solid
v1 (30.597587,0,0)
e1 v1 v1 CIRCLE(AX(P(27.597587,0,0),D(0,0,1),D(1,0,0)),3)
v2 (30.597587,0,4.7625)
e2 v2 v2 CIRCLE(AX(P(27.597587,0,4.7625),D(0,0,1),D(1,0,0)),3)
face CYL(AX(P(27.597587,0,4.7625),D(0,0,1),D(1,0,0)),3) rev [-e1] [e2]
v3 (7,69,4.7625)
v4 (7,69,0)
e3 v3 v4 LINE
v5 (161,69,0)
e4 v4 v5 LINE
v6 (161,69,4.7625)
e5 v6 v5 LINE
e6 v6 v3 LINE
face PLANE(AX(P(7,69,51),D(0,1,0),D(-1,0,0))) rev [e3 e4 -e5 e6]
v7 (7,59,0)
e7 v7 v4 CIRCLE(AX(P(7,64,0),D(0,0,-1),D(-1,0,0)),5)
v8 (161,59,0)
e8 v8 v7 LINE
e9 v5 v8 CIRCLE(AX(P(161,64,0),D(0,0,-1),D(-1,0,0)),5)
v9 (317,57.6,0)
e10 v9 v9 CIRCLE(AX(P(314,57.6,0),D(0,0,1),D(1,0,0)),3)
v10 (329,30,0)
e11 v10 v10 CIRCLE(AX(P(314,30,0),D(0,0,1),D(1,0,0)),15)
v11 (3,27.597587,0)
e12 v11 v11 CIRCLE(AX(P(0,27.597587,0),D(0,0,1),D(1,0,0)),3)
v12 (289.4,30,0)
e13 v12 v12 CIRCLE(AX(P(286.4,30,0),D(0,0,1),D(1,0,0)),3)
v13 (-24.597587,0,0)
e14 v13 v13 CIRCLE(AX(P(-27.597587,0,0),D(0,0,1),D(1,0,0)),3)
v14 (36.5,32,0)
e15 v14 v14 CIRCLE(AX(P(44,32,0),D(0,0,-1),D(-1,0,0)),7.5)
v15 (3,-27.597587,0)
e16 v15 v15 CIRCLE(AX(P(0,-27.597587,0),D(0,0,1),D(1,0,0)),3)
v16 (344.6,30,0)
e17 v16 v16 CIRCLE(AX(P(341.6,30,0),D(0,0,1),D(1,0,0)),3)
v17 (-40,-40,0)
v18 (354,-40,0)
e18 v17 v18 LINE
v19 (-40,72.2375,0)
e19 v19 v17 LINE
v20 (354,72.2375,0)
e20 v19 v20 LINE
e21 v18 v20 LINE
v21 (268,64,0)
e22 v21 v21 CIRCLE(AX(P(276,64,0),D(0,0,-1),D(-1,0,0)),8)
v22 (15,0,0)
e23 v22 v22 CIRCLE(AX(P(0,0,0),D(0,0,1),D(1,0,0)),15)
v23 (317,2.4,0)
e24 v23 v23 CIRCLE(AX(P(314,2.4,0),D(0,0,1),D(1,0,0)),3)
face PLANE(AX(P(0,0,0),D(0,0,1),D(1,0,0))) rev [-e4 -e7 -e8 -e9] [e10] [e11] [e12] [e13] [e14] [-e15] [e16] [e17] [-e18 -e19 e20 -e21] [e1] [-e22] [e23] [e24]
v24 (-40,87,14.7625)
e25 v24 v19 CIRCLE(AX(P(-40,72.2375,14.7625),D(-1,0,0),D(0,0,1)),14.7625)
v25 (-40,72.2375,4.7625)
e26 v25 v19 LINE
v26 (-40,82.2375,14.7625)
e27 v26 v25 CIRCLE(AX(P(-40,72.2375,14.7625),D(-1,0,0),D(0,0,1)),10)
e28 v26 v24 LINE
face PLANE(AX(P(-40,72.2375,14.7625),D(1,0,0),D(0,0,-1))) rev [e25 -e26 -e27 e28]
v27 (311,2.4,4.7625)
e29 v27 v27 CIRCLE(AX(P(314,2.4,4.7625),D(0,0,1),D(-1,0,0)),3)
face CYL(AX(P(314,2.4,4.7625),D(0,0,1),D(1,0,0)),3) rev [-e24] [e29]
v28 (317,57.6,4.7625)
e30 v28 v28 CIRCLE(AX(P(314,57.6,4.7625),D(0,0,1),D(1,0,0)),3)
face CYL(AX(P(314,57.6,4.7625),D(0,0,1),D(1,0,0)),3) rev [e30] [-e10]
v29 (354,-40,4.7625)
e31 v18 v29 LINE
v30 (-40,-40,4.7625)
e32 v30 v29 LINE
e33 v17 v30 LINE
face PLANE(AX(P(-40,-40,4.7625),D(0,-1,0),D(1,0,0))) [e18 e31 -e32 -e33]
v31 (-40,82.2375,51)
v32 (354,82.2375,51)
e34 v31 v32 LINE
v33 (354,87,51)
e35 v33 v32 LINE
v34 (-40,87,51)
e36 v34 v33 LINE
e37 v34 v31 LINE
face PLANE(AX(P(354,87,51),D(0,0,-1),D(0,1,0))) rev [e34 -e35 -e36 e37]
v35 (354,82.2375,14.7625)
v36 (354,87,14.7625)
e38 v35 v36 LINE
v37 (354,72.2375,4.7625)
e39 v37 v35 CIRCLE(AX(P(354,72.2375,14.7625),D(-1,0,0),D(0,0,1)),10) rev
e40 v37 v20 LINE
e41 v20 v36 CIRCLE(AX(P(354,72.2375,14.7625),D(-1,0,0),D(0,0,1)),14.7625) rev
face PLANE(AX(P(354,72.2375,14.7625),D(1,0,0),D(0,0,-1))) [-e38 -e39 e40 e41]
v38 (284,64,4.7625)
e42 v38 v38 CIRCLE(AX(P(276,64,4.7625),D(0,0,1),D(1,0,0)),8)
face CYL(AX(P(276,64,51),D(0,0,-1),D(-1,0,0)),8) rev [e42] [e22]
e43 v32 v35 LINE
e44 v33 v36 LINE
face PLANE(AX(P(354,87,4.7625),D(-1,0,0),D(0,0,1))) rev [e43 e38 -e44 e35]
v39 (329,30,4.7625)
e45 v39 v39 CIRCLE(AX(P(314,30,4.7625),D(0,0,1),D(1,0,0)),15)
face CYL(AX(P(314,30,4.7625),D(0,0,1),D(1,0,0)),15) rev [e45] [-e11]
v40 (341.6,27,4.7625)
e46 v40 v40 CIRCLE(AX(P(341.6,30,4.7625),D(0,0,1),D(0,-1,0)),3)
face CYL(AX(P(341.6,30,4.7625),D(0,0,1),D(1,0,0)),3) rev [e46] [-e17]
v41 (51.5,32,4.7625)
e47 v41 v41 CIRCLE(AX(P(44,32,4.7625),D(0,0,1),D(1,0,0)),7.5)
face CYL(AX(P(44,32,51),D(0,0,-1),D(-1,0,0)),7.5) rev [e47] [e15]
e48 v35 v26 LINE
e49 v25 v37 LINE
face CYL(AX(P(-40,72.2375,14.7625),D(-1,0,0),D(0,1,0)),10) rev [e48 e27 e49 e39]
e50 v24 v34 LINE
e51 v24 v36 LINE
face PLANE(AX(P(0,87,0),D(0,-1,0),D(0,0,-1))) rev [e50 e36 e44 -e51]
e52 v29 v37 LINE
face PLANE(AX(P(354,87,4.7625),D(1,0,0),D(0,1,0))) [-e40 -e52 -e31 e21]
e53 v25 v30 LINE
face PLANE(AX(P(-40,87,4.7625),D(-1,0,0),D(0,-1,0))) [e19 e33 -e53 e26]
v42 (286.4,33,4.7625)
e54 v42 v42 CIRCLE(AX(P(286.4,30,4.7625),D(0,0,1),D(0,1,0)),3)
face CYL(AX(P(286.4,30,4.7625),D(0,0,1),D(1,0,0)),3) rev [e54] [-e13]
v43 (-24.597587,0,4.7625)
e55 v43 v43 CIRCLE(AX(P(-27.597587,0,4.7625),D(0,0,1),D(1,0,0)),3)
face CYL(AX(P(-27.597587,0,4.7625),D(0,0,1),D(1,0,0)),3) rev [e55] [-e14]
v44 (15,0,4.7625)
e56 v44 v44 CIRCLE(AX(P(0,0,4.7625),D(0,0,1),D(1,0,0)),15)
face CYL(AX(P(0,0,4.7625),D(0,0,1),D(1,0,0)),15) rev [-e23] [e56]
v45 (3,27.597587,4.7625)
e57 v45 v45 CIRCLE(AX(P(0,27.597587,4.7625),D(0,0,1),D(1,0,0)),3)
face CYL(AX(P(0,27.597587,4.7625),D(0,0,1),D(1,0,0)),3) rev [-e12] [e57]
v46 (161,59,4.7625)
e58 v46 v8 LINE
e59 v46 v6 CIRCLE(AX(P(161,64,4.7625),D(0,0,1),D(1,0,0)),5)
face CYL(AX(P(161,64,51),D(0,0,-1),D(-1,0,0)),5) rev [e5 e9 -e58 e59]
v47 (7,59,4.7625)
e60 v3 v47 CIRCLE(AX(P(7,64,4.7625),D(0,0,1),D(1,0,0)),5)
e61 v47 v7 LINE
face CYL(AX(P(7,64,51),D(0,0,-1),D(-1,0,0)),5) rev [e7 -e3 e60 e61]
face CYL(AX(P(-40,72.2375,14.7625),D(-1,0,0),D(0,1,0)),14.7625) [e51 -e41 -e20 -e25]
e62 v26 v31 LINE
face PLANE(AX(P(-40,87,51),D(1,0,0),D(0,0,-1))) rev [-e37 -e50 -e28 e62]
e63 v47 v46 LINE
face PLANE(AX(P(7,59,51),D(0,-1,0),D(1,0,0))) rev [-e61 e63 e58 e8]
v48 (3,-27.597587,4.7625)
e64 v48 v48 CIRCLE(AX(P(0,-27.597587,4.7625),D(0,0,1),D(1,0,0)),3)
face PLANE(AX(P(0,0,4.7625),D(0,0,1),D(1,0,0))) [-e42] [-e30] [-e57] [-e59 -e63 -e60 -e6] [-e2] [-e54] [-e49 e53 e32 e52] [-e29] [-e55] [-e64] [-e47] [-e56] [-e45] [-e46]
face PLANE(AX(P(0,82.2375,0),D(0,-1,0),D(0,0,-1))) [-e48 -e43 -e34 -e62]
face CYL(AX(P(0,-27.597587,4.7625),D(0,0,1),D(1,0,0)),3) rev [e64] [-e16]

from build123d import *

# Parameters (mm, degrees)
CROQUIS1_W                       = 394
CROQUIS1_H                       = 127
CROQUIS1_R                       = 15
SALIENTE_EXTRUIR1_DEPTH          = 4.7625
CROQUIS2_R                       = 3
CORTAR_EXTRUIR1_DEPTH            = 365.565057851
CROQUIS3_R                       = 3
CORTAR_EXTRUIR2_DEPTH            = 365.565057851
MATRIZC1_COUNT                   = 4
BRIDA_DE_ARISTA1_STRIP_W         = 39.05
BRIDA_DE_ARISTA1_STRIP_H         = 4.7625
BRIDA_DE_ARISTA1_STRIP_CUT_DEPTH = 394
BRIDA_DE_ARISTA1_DEPTH           = 394
CORTAR_EXTRUIR3_DEPTH            = 369.084229491
CROQUIS15_R                      = 7.5
CORTAR_EXTRUIR4_DEPTH            = 369.084229491
CROQUIS16_R                      = 8
CORTAR_EXTRUIR5_DEPTH            = 369.084229491


# Sheet-metal steps are written as plain solids
with BuildPart() as part:
    # Croquis1 → Saliente-Extruir1 (new body)
    with BuildSketch(Plane.XY):
        with Locations((157, 23.5)):
            Rectangle(CROQUIS1_W, CROQUIS1_H)
        with Locations(Location((0, 0, 0), (0, 0, 180))):
            Circle(CROQUIS1_R, mode=Mode.SUBTRACT)
        with Locations(Location((314, 30, 0), (0, 0, 180))):
            Circle(CROQUIS1_R, mode=Mode.SUBTRACT)
    extrude(amount=SALIENTE_EXTRUIR1_DEPTH)

    # Croquis2 → Cortar-Extruir1 (cut, through all)
    with BuildSketch(Plane.XY.offset(4.7625)):
        with Locations((0, 27.597586589)):
            Circle(CROQUIS2_R)
        with Locations((27.597586589, 0)):
            Circle(CROQUIS2_R)
        with Locations((0, -27.597586589)):
            Circle(CROQUIS2_R)
        with Locations((-27.597586589, 0)):
            Circle(CROQUIS2_R)
    extrude(amount=-CORTAR_EXTRUIR1_DEPTH, mode=Mode.SUBTRACT)

    # Croquis3 → Cortar-Extruir2 (cut, through all)
    with BuildSketch(Plane.XY.offset(4.7625)):
        with Locations((314, 57.6)):
            Circle(CROQUIS3_R)
    cortar_extruir2 = extrude(amount=-CORTAR_EXTRUIR2_DEPTH, mode=Mode.SUBTRACT)

    # MatrizC1: Cortar-Extruir2 ×4 about axis
    matrizc1_axis = Axis((314, 30, 0), (0, 0, 1))
    for i in range(1, MATRIZC1_COUNT):
        add(cortar_extruir2.rotate(matrizc1_axis, i * 360 / MATRIZC1_COUNT), mode=Mode.SUBTRACT)

    # Brida de arista1 strip (across the edge) → Brida de arista1 strip cut (cut)
    with BuildSketch(Plane(origin=(354, 87, 4.7625), x_dir=(0, -1, 0), z_dir=(-1, 0, 0))):
        with Locations((-4.7625, -2.38125)):
            Rectangle(BRIDA_DE_ARISTA1_STRIP_W, BRIDA_DE_ARISTA1_STRIP_H)
    extrude(amount=BRIDA_DE_ARISTA1_STRIP_CUT_DEPTH, mode=Mode.SUBTRACT)

    # Brida de arista1 section (across the edge) → Brida de arista1 (add)
    with BuildSketch(Plane(origin=(354, 87, 4.7625), x_dir=(0, -1, 0), z_dir=(-1, 0, 0))):
        with BuildLine():
            Line((0, 10), (0, 46.2375))
            Line((0, 46.2375), (4.7625, 46.2375))
            Line((4.7625, 46.2375), (4.7625, 10))
            ThreePointArc((4.7625, 10), (7.691432188, 2.928932188), (14.7625, 0))
            Line((14.7625, 0), (14.7625, -4.7625))
            ThreePointArc((14.7625, -4.7625), (4.323836143, -0.438663857), (0, 10))
        make_face()
    extrude(amount=BRIDA_DE_ARISTA1_DEPTH)

    # Croquis14 → Cortar-Extruir3 (cut, through all)
    with BuildSketch(Plane(origin=(0, 0, 0), x_dir=(-1, 0, 0), z_dir=(0, 0, -1))):
        with BuildLine():
            Line((-7, 59), (-161, 59))
            ThreePointArc((-161, 59), (-166, 64), (-161, 69))
            Line((-161, 69), (-7, 69))
            ThreePointArc((-7, 69), (-2, 64), (-7, 59))
        make_face()
    extrude(amount=-CORTAR_EXTRUIR3_DEPTH, mode=Mode.SUBTRACT)

    # Croquis15 → Cortar-Extruir4 (cut, through all)
    with BuildSketch(Plane(origin=(0, 0, 0), x_dir=(-1, 0, 0), z_dir=(0, 0, -1))):
        with Locations((-44, 32)):
            Circle(CROQUIS15_R)
    extrude(amount=-CORTAR_EXTRUIR4_DEPTH, mode=Mode.SUBTRACT)

    # Croquis16 → Cortar-Extruir5 (cut, through all)
    with BuildSketch(Plane(origin=(0, 0, 0), x_dir=(-1, 0, 0), z_dir=(0, 0, -1))):
        with Locations((-276, 64)):
            Circle(CROQUIS16_R)
    extrude(amount=-CORTAR_EXTRUIR5_DEPTH, mode=Mode.SUBTRACT)


solid = part.part
